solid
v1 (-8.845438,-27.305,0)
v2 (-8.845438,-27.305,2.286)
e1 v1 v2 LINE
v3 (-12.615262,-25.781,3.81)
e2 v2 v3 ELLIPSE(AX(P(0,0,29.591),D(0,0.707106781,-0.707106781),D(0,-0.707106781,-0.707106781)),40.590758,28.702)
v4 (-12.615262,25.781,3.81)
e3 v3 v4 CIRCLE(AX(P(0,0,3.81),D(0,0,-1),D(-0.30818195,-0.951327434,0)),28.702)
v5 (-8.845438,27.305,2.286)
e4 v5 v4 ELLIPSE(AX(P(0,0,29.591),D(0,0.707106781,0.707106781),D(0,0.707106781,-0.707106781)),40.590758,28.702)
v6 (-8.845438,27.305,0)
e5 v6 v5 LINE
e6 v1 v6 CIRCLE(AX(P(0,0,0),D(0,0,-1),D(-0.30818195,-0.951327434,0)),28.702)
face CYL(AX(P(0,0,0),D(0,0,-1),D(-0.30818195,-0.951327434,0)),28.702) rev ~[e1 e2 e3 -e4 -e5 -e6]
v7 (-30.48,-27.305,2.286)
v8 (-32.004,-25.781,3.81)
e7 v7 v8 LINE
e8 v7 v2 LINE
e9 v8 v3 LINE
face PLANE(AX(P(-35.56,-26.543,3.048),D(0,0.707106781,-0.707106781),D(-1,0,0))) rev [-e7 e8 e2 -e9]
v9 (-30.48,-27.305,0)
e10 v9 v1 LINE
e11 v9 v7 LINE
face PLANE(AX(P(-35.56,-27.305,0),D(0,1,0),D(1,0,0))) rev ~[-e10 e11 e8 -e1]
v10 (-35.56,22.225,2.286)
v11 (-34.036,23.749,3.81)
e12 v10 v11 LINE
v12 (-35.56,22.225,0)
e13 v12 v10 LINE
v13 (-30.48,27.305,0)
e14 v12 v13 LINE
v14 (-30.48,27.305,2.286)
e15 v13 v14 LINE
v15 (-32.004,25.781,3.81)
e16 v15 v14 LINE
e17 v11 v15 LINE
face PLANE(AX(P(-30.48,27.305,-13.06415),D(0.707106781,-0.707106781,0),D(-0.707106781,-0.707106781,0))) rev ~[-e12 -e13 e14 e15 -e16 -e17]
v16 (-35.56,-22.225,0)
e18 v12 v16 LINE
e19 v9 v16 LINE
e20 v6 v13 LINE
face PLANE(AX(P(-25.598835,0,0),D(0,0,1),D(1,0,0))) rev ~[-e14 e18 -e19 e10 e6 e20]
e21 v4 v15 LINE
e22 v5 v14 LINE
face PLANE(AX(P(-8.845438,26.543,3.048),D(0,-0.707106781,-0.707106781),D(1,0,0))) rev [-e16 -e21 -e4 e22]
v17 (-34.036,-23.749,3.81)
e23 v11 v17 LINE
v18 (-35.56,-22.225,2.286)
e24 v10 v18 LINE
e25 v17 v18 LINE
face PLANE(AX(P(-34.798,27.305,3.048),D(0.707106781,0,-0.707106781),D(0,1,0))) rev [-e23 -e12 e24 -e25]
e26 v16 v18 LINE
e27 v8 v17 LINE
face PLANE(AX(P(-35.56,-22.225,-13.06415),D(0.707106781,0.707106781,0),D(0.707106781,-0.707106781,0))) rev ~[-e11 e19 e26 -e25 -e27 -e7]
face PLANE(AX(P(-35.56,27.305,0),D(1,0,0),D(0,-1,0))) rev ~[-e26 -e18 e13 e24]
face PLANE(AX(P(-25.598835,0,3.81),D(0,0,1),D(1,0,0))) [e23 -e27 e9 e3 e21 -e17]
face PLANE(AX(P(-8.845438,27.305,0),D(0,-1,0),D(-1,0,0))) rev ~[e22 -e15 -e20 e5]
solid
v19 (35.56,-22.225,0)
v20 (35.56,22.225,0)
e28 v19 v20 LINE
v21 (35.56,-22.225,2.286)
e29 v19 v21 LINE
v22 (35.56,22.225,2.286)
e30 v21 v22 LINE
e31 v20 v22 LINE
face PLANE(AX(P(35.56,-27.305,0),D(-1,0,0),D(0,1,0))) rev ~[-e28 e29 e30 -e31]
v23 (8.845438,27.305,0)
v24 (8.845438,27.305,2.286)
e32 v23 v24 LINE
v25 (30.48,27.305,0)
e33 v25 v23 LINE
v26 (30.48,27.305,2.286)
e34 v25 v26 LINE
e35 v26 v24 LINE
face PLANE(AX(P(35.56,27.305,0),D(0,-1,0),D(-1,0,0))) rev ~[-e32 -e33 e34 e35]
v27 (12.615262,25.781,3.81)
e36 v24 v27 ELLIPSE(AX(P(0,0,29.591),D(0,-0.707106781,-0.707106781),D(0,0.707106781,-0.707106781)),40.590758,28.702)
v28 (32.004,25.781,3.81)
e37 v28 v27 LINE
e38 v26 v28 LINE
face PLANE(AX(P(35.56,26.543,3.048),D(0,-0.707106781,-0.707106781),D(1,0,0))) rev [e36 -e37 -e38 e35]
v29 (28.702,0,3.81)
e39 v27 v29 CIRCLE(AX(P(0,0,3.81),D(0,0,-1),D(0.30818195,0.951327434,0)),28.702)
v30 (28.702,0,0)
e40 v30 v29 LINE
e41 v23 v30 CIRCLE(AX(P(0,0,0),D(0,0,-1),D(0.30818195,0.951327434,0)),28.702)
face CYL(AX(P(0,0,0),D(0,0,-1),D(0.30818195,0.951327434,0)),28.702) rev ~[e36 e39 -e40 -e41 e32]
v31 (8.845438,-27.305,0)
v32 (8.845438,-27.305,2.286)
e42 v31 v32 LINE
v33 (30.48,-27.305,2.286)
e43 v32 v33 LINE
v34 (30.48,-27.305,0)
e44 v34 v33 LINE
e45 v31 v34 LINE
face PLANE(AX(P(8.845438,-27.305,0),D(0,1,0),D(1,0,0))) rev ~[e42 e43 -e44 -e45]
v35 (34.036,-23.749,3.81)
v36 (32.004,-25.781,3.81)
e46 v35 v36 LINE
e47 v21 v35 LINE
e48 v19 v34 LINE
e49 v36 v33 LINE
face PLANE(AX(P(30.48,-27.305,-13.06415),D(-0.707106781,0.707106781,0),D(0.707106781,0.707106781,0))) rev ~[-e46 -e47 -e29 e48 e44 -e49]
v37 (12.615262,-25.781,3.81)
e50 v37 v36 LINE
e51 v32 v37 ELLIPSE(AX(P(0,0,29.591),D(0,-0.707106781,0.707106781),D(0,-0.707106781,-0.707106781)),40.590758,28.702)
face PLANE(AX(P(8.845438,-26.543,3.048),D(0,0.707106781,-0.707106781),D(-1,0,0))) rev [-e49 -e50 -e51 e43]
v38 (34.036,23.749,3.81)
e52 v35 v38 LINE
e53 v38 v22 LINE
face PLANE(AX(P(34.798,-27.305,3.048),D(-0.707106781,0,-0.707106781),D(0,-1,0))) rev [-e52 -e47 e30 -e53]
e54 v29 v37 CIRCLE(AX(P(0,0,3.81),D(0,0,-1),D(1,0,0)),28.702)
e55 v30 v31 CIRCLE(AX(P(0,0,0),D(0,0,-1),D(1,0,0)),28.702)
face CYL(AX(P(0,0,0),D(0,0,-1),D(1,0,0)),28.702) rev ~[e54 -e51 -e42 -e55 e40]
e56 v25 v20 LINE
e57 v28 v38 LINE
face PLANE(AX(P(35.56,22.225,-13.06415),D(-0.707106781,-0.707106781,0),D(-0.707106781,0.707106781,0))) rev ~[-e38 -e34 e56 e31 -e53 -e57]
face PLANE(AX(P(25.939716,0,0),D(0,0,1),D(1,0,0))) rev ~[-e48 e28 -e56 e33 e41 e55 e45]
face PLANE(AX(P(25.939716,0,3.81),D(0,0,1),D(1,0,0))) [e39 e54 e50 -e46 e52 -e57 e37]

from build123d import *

# Parameters (mm, degrees)
F1_DEPTH      = 3.81
F2_SIZE       = 1.524
F2_2_SIZE     = 1.524
F3_T1_DEPTH   = 28.4142991577
F3_2_T1_DEPTH = 28.4142991577


# Not quite as in the source:
# - a fillet or chamfer that OpenCascade refuses, or shapes differently, is made with other operations: its cross-section is extruded or revolved along the edge and cut away or added


with BuildPart() as f1:
    # F0 (on Top) → F1 (new body)
    with BuildSketch(Plane.XY):
        with BuildLine():
            Line((-8.8454383159, 27.305), (-35.56, 27.305))
            Line((-35.56, 27.305), (-35.56, -27.305))
            Line((-35.56, -27.305), (-8.8454383159, -27.305))
            ThreePointArc((-8.8454383159, -27.305), (-28.702, 0), (-8.8454383159, 27.305))
        make_face()
    extrude(amount=F1_DEPTH)

    # F2
    f2_edges = [f1.edges().sort_by_distance(p)[0] for p in [
        (-35.56, 0, 3.81),
        (-22.202719, 27.305, 3.81),
        (-22.202719, -27.305, 3.81),
    ]]
    chamfer(f2_edges, length=F2_SIZE)

    # F3#2: chamfer of 5.08 on 2 edges, made by hand

    # F3_2_s2 → F3_2_t1 (cut)
    with BuildSketch(Plane.XY.offset(-13.0641495789)):
        Polygon((-35.56, -22.225), (-30.48, -27.305), (-35.56, -27.305), align=None)
        Polygon((-30.48, 27.305), (-35.56, 22.225), (-35.56, 27.305), align=None)
    extrude(amount=F3_2_T1_DEPTH, mode=Mode.SUBTRACT)


with BuildPart() as f1b:
    # F0 (on Top) → F1, piece 2 (new body)
    with BuildSketch(Plane.XY):
        with BuildLine():
            Line((35.56, 27.305), (8.8454383159, 27.305))
            ThreePointArc((8.8454383159, 27.305), (23.2129982396, 16.8808032015), (28.702, 0))
            ThreePointArc((28.702, 0), (23.2129982396, -16.8808032015), (8.8454383159, -27.305))
            Line((8.8454383159, -27.305), (35.56, -27.305))
            Line((35.56, -27.305), (35.56, 27.305))
        make_face()
    extrude(amount=F1_DEPTH)

    # F2#2
    f2_2_edges = [f1b.edges().sort_by_distance(p)[0] for p in [
        (22.202719, -27.305, 3.81),
        (35.56, 0, 3.81),
        (22.202719, 27.305, 3.81),
    ]]
    chamfer(f2_2_edges, length=F2_2_SIZE)

    # F3: chamfer of 5.08 on 2 edges, made by hand

    # F3_s2 → F3_t1 (cut)
    with BuildSketch(Plane.XY.offset(-13.0641495789)):
        Polygon((30.48, -27.305), (35.56, -22.225), (35.56, -27.305), align=None)
        Polygon((35.56, 22.225), (30.48, 27.305), (35.56, 27.305), align=None)
    extrude(amount=F3_T1_DEPTH, mode=Mode.SUBTRACT)


solid = Compound([f1.part, f1b.part])
